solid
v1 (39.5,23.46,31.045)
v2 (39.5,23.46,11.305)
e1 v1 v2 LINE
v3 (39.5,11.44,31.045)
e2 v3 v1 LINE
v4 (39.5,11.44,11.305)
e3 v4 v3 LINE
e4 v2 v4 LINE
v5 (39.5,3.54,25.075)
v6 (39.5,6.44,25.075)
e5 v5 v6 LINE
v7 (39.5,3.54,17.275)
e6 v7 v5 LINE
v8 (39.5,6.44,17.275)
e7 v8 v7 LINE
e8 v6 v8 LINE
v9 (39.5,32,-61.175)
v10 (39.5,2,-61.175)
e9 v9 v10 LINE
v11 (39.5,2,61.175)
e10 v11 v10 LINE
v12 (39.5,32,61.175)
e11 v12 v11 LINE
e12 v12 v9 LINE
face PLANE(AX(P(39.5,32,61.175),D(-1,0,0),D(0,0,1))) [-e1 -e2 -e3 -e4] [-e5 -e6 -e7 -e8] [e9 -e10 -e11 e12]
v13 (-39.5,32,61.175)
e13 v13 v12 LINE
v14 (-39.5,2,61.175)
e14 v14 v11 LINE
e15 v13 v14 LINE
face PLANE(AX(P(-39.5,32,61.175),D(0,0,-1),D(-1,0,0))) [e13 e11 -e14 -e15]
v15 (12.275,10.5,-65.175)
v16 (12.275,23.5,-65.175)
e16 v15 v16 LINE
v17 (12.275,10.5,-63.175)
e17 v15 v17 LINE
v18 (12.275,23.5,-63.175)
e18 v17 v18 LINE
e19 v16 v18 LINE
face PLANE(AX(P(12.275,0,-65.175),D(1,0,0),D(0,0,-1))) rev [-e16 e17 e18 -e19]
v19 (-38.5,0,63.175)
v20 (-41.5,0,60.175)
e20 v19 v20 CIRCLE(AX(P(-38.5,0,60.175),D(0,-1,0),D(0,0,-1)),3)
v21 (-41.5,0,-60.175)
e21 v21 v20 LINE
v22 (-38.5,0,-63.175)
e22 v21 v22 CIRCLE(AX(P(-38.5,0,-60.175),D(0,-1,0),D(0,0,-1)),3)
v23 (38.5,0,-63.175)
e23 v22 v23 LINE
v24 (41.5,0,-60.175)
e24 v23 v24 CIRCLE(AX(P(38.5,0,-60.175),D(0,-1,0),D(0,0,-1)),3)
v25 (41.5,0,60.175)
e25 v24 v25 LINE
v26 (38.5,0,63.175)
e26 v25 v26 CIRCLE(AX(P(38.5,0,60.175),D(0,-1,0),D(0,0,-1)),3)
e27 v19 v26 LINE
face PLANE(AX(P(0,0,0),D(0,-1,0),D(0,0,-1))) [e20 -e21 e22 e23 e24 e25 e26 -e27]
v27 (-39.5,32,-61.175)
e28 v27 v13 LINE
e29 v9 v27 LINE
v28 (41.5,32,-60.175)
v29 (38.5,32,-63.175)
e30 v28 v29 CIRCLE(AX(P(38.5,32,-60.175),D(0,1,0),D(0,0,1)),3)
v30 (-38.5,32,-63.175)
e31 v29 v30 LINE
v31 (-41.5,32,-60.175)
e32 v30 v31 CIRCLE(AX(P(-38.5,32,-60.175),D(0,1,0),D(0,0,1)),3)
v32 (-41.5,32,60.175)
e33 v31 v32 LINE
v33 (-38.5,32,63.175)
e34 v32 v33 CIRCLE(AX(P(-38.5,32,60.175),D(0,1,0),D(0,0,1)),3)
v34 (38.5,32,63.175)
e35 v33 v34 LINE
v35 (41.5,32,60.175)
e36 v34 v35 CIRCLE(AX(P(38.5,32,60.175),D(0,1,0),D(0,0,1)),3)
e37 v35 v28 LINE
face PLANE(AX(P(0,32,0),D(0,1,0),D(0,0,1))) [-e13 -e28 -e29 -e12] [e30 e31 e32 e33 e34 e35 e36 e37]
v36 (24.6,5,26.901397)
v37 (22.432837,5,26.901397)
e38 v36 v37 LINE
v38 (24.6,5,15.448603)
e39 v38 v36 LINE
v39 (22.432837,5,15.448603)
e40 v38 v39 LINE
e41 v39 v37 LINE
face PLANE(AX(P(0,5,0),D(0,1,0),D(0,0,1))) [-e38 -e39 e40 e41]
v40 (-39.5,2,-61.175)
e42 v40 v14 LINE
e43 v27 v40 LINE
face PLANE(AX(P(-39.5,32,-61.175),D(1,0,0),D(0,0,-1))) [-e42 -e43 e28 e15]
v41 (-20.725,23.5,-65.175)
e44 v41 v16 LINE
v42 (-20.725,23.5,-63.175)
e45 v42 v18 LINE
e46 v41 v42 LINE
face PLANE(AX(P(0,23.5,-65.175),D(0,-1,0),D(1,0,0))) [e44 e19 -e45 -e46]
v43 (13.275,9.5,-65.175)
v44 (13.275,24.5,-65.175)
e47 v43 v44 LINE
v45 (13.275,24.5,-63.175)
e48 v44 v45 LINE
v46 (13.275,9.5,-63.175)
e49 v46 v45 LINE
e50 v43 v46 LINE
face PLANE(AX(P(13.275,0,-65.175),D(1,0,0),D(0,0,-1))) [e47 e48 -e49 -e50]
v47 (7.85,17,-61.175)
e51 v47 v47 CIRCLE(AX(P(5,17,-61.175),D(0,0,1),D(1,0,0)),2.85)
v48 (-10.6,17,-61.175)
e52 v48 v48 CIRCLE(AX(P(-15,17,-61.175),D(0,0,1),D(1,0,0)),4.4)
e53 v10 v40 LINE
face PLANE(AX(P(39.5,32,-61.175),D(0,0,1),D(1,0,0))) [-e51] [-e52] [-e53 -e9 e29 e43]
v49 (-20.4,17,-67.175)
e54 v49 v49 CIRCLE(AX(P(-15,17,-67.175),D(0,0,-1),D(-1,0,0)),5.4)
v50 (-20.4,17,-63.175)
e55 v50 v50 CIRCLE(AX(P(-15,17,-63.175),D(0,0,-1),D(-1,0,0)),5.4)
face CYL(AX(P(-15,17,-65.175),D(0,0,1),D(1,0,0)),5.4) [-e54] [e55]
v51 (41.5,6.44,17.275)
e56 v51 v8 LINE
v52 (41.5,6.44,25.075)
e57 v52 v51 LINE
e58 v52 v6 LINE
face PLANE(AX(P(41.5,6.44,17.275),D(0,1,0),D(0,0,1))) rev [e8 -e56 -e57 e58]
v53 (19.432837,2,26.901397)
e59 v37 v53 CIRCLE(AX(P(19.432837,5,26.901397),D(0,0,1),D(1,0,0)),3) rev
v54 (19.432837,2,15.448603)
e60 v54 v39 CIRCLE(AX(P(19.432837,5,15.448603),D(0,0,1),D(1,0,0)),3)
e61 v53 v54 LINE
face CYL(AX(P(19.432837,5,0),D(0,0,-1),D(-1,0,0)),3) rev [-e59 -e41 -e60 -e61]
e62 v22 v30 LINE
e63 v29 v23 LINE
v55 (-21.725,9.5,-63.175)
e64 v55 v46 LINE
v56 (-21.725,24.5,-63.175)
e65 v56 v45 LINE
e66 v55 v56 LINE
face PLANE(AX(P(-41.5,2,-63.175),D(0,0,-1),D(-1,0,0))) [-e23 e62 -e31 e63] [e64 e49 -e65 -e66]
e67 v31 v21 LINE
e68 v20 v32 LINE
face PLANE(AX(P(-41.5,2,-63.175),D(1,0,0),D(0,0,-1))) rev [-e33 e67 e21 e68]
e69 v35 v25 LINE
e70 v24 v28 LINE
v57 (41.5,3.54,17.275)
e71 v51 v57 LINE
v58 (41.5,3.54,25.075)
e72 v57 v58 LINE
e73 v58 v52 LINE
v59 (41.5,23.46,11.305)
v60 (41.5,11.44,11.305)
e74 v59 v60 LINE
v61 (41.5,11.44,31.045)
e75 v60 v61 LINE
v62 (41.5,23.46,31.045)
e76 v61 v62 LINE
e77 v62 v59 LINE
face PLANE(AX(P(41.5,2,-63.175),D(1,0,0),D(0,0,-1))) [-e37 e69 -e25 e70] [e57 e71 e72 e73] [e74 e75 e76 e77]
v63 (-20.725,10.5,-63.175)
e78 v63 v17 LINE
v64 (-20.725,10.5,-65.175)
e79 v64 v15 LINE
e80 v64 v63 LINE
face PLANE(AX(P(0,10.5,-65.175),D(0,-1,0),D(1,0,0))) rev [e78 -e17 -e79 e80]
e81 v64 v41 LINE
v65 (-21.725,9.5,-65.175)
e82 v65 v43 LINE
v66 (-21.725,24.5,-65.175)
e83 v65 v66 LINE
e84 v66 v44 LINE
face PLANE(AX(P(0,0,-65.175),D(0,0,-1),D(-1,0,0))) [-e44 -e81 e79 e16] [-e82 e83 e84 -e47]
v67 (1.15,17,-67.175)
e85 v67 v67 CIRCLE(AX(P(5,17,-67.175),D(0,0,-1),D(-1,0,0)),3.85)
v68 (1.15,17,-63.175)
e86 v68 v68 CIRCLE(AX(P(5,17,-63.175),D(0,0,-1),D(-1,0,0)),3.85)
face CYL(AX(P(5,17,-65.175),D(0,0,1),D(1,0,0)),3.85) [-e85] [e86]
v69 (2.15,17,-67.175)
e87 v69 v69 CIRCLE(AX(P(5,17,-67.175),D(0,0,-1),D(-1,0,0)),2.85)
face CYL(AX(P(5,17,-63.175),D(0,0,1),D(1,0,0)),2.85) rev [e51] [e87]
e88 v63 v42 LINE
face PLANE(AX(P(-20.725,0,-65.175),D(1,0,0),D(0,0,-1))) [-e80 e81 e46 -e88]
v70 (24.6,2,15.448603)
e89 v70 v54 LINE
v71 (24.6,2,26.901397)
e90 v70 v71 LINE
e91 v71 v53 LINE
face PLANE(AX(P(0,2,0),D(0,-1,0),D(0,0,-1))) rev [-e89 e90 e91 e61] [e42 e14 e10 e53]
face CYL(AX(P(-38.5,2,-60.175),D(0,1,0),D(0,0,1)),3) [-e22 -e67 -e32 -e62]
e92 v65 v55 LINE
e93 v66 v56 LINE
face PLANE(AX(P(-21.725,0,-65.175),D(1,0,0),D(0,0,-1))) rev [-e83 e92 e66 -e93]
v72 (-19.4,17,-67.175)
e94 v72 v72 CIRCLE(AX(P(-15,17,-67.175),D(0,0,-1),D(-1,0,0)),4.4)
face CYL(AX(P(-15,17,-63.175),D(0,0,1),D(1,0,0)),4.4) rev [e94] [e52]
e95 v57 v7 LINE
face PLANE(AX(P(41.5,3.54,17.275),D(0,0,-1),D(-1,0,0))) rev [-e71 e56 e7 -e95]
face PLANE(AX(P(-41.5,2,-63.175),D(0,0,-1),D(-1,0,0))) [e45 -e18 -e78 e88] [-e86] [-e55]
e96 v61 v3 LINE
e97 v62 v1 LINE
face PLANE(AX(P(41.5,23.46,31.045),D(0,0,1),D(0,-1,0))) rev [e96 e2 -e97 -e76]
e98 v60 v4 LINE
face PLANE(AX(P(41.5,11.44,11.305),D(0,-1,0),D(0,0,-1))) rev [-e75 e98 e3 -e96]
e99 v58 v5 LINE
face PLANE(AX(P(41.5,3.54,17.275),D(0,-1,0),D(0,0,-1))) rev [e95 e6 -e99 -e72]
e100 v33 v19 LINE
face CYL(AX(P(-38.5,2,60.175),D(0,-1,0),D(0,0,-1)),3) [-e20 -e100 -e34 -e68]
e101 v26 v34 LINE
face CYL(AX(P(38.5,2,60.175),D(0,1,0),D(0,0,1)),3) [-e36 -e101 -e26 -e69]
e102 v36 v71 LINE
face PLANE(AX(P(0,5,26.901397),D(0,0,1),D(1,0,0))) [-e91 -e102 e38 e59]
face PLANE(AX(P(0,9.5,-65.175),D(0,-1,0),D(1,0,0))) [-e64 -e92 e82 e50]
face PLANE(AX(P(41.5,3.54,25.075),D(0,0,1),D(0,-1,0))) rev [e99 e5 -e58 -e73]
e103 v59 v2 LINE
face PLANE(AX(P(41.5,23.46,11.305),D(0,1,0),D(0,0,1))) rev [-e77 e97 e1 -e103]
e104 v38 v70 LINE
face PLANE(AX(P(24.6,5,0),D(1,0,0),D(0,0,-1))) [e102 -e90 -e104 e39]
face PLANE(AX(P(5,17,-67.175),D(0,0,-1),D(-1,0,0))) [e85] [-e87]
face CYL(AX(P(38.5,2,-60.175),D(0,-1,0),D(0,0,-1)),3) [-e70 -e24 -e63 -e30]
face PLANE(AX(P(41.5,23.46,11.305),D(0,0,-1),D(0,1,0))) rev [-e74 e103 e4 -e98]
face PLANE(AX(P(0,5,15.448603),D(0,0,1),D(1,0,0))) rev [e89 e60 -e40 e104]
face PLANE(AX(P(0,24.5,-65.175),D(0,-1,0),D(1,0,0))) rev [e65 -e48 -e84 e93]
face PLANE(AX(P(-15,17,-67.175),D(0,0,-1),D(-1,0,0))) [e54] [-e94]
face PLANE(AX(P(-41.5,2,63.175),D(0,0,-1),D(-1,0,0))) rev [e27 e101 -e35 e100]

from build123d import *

# Parameters (mm, degrees)
SKETCH1_W           = 83
SKETCH1_H           = 126.35
BOSS_EXTRUDE1_DEPTH = 2
SKETCH2_W           = 83
SKETCH2_H           = 126.35
SKETCH2_W_2         = 79
SKETCH2_H_2         = 122.35
BOSS_EXTRUDE2_DEPTH = 30
SKETCH3_W           = 7.8
SKETCH3_H           = 2.9
SKETCH3_W_2         = 19.74
SKETCH3_H_2         = 12.02
CUT_EXTRUDE1_DEPTH  = 108.59219593
SKETCH4_W           = 2.167162511
SKETCH4_H           = 11.452793886
BOSS_EXTRUDE3_DEPTH = 3
FILLET2_R           = 3
FILLET1_R           = 3
SKETCH6_R           = 4.4
SKETCH6_R_2         = 2.85
CUT_EXTRUDE2_DEPTH  = 135.941366897
SKETCH7_W           = 35
SKETCH7_H           = 15
SKETCH7_W_2         = 33
SKETCH7_H_2         = 13
SKETCH7_R           = 5.4
SKETCH7_R_2         = 4.4
SKETCH7_R_3         = 3.85
SKETCH7_R_4         = 2.85
BOSS_EXTRUDE4_DEPTH = 2
SKETCH8_R           = 3.85
SKETCH8_R_2         = 2.85
SKETCH8_R_3         = 5.4
SKETCH8_R_4         = 4.4
BOSS_EXTRUDE5_DEPTH = 2


with BuildPart() as part:
    # Sketch1 → Boss-Extrude1 (new body)
    with BuildSketch(Plane(origin=(0, 0, 0), x_dir=(1, 0, 0), z_dir=(0, 1, 0))):
        Rectangle(SKETCH1_W, SKETCH1_H)
    extrude(amount=BOSS_EXTRUDE1_DEPTH)

    # Sketch2 → Boss-Extrude2 (add)
    with BuildSketch(Plane(origin=(0, 2, 0), x_dir=(1, 0, 0), z_dir=(0, 1, 0))):
        Rectangle(SKETCH2_W, SKETCH2_H)
        Rectangle(SKETCH2_W_2, SKETCH2_H_2, mode=Mode.SUBTRACT)
    extrude(amount=BOSS_EXTRUDE2_DEPTH)

    # Sketch3 → Cut-Extrude1 (cut, through all)
    with BuildSketch(Plane.ZY.offset(-39.5)):
        with Locations((21.175, 4.99)):
            Rectangle(SKETCH3_W, SKETCH3_H)
        with Locations((21.175, 17.45)):
            Rectangle(SKETCH3_W_2, SKETCH3_H_2)
    extrude(amount=-CUT_EXTRUDE1_DEPTH, mode=Mode.SUBTRACT)

    # Sketch4 → Boss-Extrude3 (add)
    with BuildSketch(Plane(origin=(0, 2, 0), x_dir=(1, 0, 0), z_dir=(0, 1, 0))):
        with Locations((23.516418745, -21.175)):
            Rectangle(SKETCH4_W, SKETCH4_H)
    extrude(amount=BOSS_EXTRUDE3_DEPTH)

    # Fillet2
    fillet2_edges = [part.edges().sort_by_distance(p)[0] for p in [
        (22.432837489, 2, 21.175),
    ]]
    fillet(fillet2_edges, radius=FILLET2_R - 0.0001)  # a hair under: the kernel refuses the full size

    # Fillet1
    fillet1_edges = [part.edges().sort_by_distance(p)[0] for p in [
        (-41.5, 16, -63.175),
        (-41.5, 16, 63.175),
        (41.5, 16, 63.175),
        (41.5, 16, -63.175),
    ]]
    fillet(fillet1_edges, radius=FILLET1_R)

    # Sketch6 → Cut-Extrude2 (cut, through all)
    with BuildSketch(Plane.XY.offset(-61.175)):
        with Locations((-15, 17)):
            Circle(SKETCH6_R)
        with Locations((5, 17)):
            Circle(SKETCH6_R_2)
    extrude(amount=-CUT_EXTRUDE2_DEPTH, mode=Mode.SUBTRACT)

    # Sketch7 → Boss-Extrude4 (add)
    # profile 1 of 3: a face of its own
    with BuildSketch(Plane(origin=(0, 0, -63.175), x_dir=(-1, 0, 0), z_dir=(0, 0, -1))):
        with Locations((4.225, 17)):
            Rectangle(SKETCH7_W, SKETCH7_H)
        with Locations((4.225, 17)):
            Rectangle(SKETCH7_W_2, SKETCH7_H_2, mode=Mode.SUBTRACT)
    # profile 2 of 3: a face of its own
    with BuildSketch(Plane(origin=(0, 0, -63.175), x_dir=(-1, 0, 0), z_dir=(0, 0, -1))):
        with Locations((15, 17)):
            Circle(SKETCH7_R)
        with Locations(Location((15, 17, 0), (0, 0, 180))):
            Circle(SKETCH7_R_2, mode=Mode.SUBTRACT)
    # profile 3 of 3: a face of its own
    with BuildSketch(Plane(origin=(0, 0, -63.175), x_dir=(-1, 0, 0), z_dir=(0, 0, -1))):
        with Locations((-5, 17)):
            Circle(SKETCH7_R_3)
        with Locations(Location((-5, 17, 0), (0, 0, 180))):
            Circle(SKETCH7_R_4, mode=Mode.SUBTRACT)
    extrude(amount=BOSS_EXTRUDE4_DEPTH)

    # Sketch8 → Boss-Extrude5 (add)
    # profile 1 of 2: a face of its own
    with BuildSketch(Plane(origin=(0, 0, -65.175), x_dir=(-1, 0, 0), z_dir=(0, 0, -1))):
        with Locations((-5, 17)):
            Circle(SKETCH8_R)
        with Locations(Location((-5, 17, 0), (0, 0, 180))):
            Circle(SKETCH8_R_2, mode=Mode.SUBTRACT)
    # profile 2 of 2: a face of its own
    with BuildSketch(Plane(origin=(0, 0, -65.175), x_dir=(-1, 0, 0), z_dir=(0, 0, -1))):
        with Locations((15, 17)):
            Circle(SKETCH8_R_3)
        with Locations(Location((15, 17, 0), (0, 0, 180))):
            Circle(SKETCH8_R_4, mode=Mode.SUBTRACT)
    extrude(amount=BOSS_EXTRUDE5_DEPTH)


solid = part.part
